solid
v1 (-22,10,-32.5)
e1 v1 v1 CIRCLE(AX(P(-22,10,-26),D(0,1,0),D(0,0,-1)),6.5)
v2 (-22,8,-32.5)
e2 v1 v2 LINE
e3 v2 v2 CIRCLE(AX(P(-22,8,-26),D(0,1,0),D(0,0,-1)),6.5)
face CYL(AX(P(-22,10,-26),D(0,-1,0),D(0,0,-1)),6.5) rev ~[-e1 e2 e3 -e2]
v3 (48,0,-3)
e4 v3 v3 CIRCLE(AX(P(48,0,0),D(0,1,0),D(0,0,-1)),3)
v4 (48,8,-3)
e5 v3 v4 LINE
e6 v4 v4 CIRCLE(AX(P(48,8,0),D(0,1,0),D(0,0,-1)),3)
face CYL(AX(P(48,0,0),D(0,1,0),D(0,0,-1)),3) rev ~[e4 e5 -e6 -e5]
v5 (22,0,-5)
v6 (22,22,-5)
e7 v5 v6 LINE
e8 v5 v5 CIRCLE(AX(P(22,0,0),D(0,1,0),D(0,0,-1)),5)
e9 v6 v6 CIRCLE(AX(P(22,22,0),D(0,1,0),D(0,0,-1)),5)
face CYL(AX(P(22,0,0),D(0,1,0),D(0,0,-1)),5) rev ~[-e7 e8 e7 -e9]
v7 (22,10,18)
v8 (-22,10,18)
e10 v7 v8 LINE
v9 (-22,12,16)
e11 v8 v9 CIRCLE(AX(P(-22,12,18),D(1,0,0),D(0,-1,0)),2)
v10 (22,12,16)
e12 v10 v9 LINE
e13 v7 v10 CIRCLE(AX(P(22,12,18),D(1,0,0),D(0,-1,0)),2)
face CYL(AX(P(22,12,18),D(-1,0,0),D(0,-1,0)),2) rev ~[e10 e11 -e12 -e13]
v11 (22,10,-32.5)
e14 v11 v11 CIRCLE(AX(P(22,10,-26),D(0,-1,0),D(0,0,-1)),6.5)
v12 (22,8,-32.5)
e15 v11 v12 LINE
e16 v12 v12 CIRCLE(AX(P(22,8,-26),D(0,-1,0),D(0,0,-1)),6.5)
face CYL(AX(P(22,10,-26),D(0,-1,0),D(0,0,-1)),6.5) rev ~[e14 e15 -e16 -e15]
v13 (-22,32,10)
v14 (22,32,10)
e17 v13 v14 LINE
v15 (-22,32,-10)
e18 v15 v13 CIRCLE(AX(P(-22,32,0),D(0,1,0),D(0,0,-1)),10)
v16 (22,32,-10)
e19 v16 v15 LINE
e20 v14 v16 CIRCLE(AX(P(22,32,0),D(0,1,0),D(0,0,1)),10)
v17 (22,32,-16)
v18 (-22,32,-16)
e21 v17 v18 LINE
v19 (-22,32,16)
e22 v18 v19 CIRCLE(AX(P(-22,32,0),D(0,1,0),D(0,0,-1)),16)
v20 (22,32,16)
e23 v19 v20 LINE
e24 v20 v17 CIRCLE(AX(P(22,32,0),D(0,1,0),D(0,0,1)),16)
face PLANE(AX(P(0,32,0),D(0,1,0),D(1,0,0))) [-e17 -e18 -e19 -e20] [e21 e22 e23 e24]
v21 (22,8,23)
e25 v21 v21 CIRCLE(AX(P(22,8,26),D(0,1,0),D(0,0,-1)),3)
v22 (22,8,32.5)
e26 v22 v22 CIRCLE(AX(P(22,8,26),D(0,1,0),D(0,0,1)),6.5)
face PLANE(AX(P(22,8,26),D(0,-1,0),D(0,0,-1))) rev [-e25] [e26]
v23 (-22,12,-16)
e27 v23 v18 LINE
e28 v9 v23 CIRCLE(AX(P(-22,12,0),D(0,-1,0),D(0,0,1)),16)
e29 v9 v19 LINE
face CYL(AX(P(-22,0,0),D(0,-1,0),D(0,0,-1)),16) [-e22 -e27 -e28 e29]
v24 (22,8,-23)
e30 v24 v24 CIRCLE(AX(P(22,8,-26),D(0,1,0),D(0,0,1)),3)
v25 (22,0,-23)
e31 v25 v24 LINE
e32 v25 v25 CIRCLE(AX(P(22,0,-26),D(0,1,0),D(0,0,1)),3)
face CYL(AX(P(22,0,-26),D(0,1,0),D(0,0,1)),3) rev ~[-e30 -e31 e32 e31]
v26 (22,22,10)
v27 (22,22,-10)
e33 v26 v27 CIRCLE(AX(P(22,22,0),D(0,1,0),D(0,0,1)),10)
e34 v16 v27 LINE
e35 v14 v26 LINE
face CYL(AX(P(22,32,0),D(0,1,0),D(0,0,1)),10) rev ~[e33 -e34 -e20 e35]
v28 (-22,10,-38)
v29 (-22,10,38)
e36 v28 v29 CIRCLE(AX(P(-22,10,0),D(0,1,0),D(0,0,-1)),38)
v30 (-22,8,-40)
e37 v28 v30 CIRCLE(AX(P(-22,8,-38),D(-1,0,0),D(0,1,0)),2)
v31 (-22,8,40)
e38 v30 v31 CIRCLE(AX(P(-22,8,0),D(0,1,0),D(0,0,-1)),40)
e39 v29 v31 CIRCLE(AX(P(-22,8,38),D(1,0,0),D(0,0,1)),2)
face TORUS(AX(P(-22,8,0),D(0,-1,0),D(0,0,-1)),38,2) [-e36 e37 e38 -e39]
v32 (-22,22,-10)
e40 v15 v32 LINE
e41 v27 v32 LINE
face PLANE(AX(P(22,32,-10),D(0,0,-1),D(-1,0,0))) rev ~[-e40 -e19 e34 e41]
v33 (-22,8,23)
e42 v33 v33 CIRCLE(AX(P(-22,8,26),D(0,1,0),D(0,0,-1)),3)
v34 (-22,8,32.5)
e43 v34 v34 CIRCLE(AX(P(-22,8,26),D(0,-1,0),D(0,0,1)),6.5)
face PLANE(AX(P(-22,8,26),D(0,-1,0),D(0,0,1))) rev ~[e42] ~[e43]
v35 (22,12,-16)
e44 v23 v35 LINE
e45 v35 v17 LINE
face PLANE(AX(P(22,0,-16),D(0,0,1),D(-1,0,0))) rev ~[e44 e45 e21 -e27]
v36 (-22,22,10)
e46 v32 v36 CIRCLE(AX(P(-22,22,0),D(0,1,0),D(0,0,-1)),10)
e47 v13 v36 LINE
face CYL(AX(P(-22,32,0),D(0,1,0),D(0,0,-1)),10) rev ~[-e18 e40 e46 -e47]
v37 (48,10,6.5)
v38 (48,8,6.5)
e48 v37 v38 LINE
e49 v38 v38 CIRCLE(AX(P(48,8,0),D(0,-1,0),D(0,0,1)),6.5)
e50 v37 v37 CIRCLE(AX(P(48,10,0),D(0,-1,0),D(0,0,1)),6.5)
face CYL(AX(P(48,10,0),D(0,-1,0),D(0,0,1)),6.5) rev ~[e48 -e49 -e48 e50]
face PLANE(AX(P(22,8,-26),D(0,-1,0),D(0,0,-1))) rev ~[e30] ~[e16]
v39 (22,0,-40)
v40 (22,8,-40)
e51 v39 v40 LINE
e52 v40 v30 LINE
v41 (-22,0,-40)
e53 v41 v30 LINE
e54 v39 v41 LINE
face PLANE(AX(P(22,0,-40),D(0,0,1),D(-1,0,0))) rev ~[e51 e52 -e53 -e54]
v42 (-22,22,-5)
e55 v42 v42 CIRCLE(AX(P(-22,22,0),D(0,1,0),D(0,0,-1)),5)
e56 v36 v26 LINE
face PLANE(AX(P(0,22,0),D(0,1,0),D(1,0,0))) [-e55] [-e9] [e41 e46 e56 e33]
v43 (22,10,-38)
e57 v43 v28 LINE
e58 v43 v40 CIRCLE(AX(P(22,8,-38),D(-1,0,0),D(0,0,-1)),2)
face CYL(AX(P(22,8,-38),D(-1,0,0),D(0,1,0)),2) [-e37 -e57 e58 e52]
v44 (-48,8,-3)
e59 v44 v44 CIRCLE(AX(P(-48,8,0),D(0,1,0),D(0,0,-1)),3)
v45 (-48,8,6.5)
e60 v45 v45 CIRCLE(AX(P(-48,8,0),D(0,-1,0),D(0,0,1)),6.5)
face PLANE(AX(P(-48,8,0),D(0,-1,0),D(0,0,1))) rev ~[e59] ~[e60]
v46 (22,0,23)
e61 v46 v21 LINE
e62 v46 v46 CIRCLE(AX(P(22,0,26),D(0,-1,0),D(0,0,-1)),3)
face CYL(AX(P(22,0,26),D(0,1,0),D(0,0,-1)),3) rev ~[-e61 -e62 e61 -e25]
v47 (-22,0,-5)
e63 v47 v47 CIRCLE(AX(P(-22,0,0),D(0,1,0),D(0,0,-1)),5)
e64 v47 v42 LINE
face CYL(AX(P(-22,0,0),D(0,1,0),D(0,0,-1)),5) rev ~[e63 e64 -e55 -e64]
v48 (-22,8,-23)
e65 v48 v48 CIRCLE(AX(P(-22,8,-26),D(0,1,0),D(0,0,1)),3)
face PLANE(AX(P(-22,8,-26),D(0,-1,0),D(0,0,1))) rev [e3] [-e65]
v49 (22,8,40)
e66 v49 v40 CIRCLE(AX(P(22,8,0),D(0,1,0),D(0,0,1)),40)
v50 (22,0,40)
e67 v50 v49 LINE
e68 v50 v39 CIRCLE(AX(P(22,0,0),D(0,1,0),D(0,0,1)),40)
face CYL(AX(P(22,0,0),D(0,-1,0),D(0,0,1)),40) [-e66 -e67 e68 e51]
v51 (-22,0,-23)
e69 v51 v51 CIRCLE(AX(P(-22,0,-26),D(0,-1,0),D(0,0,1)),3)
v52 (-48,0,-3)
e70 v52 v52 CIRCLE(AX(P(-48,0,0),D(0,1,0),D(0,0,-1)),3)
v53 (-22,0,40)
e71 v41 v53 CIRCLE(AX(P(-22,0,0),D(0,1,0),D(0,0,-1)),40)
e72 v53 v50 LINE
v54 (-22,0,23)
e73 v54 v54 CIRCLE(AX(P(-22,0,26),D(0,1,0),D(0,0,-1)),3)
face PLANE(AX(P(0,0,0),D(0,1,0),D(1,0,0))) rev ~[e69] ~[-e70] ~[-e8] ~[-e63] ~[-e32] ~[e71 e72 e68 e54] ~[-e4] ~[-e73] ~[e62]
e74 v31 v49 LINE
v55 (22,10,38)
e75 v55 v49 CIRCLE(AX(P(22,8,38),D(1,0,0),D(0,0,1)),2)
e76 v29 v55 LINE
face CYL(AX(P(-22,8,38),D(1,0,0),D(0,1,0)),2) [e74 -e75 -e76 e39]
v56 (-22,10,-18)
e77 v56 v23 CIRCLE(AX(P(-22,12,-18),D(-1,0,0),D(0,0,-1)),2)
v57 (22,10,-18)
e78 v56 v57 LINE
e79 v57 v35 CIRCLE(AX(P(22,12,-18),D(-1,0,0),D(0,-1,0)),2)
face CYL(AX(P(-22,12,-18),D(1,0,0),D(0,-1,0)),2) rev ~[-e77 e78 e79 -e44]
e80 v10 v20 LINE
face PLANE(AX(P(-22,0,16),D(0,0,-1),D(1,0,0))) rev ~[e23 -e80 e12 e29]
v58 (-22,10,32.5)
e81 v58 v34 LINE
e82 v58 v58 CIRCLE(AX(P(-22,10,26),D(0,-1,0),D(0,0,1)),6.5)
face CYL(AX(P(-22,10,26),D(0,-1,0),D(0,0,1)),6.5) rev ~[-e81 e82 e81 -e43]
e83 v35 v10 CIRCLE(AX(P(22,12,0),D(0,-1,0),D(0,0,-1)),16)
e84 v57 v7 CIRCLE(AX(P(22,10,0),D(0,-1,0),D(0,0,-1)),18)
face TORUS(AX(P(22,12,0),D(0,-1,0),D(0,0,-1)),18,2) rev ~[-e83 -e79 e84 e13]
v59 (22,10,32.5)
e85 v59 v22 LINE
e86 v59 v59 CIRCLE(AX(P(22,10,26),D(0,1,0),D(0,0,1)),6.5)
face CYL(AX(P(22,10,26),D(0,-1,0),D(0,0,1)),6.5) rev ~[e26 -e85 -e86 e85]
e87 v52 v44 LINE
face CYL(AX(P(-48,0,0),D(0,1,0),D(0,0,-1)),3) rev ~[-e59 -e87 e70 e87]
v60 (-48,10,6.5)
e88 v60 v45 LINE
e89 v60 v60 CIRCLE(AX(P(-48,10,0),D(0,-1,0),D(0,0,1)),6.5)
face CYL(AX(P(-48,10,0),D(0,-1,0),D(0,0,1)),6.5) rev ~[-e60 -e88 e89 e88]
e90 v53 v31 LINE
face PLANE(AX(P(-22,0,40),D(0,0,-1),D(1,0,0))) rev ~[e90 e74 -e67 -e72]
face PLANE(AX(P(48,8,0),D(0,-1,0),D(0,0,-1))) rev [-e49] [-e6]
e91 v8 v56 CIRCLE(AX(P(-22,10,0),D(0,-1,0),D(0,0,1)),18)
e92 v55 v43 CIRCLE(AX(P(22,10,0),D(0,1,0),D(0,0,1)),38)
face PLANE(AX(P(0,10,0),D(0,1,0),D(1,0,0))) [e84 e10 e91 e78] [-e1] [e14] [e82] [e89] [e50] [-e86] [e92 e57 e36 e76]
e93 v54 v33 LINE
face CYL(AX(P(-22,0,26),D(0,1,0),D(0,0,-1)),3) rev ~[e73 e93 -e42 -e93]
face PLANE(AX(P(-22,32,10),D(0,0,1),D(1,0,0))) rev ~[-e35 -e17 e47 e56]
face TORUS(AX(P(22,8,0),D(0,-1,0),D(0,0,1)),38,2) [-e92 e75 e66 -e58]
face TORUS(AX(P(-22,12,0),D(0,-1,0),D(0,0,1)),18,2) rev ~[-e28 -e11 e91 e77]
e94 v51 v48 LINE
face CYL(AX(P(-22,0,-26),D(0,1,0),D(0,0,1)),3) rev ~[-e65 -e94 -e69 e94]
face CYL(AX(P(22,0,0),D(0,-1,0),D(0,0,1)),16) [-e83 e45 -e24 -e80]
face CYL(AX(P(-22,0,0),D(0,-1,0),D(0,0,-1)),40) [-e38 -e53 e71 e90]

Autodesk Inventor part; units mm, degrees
ref_plane "YZ Plane" through (0, 0, 0) normal (1, 0, 0) x (0, 1, 0)
ref_plane "XZ Plane" through (0, 0, 0) normal (0, 1, 0) x (-1, 0, 0)
ref_plane "XY Plane" through (0, 0, 0) normal (0, 0, 1) x (1, 0, 0)
sketch "Sketch1" plane through (0, 0, 0) normal (0, 0, 1) x (1, 0, 0)
  line L0 (-22, 0) -> (22, 0) construction
  line L1 (-22, -40) -> (22, -40)
  line L2 (22, 40) -> (-22, 40)
  arc A0 (-22, 40) -> (-22, -40) centre (-22, 0) ccw
  arc A1 (22, -40) -> (22, 40) centre (22, 0) ccw
  line L3 (-22, 0) -> (22, 0) construction
  line L4 (-22, -16) -> (22, -16)
  line L5 (22, 16) -> (-22, 16)
  arc A2 (-22, 16) -> (-22, -16) centre (-22, 0) ccw
  arc A3 (22, -16) -> (22, 16) centre (22, 0) ccw
  line L6 (22, 10) -> (-22, 10)
  arc A4 (-22, 10) -> (-22, -10) centre (-22, 0) ccw
  line L7 (-22, -10) -> (22, -10)
  arc A5 (22, -10) -> (22, 10) centre (22, 0) ccw
  point P0 (0, 0)
  point P1 (0, 0)
  point P2 (62, 0)
  point P3 (-62, 0)
  point P4 (0, 0)
  point P5 (38, 0)
  point P6 (-38, 0)
  point P7 (-48, 0)
  point P8 (-22, -26)
  dimension "d1" = 124
  dimension "d2" = 76
  dimension "d3" = 80
  dimension "d4" = 16
  dimension "d5" = 10
  dimension "d6" = 26
  dimension "d7" = 26
extrude "Extrusion1" add sketch "Sketch1" along normal blind 10 contours A0 L2 A1 L1 | A2 L5 A3 L4 | A5 L7 A4 L6
extrude "Extrusion2" add sketch "Sketch1" along normal blind 32 contours A2 L5 A3 L4 | A5 L7 A4 L6
extrude "Extrusion3" cut sketch "Sketch1" against normal blind 10 from surface at 32 contours A5 L7 A4 L6
hole "Hole1" at (-22, -26, 0) at (-48, 0, 0) direction (0, 0, 1) diameter 6 depth 10
sketch "Sketch2" plane through (0, 0, 10) normal (0, 0, 1) x (1, 0, 0)
  circle A0 centre (-48, 0) radius 3 projected
  circle A1 centre (-22, -26) radius 3 projected
  point P0 (0, 0)
hole "Hole2" at (-48, 0, 10) at (-22, -26, 10) direction (0, 0, -1) diameter 13 depth 2
hole "Hole3" at (-22, 0, 0) direction (0, 0, 1) diameter 10 depth 22
mirror "Mirror1" about plane through (0, 0, 0) normal (1, 0, 0) of "Hole2", "Hole3", "Hole1"
mirror "Mirror2" about plane through (0, 0, 0) normal (0, 1, 0) of "Hole2", "Hole1", "Hole3", "Mirror1"
fillet "Fillet1" radius 2 8 edges at (62, 0, 10) (0, 40, 10) (-62, 0, 10) (0, -40, 10) (0, -16, 10) (-38, 0, 10) (0, 16, 10) (38, 0, 10)
move or copy body "Rotate1" bodies to move or copy 1 copy no rotation origin (0, 0, 0) rotation axis (1, 0, 0) rotation angle -90
properties part number "b2"
